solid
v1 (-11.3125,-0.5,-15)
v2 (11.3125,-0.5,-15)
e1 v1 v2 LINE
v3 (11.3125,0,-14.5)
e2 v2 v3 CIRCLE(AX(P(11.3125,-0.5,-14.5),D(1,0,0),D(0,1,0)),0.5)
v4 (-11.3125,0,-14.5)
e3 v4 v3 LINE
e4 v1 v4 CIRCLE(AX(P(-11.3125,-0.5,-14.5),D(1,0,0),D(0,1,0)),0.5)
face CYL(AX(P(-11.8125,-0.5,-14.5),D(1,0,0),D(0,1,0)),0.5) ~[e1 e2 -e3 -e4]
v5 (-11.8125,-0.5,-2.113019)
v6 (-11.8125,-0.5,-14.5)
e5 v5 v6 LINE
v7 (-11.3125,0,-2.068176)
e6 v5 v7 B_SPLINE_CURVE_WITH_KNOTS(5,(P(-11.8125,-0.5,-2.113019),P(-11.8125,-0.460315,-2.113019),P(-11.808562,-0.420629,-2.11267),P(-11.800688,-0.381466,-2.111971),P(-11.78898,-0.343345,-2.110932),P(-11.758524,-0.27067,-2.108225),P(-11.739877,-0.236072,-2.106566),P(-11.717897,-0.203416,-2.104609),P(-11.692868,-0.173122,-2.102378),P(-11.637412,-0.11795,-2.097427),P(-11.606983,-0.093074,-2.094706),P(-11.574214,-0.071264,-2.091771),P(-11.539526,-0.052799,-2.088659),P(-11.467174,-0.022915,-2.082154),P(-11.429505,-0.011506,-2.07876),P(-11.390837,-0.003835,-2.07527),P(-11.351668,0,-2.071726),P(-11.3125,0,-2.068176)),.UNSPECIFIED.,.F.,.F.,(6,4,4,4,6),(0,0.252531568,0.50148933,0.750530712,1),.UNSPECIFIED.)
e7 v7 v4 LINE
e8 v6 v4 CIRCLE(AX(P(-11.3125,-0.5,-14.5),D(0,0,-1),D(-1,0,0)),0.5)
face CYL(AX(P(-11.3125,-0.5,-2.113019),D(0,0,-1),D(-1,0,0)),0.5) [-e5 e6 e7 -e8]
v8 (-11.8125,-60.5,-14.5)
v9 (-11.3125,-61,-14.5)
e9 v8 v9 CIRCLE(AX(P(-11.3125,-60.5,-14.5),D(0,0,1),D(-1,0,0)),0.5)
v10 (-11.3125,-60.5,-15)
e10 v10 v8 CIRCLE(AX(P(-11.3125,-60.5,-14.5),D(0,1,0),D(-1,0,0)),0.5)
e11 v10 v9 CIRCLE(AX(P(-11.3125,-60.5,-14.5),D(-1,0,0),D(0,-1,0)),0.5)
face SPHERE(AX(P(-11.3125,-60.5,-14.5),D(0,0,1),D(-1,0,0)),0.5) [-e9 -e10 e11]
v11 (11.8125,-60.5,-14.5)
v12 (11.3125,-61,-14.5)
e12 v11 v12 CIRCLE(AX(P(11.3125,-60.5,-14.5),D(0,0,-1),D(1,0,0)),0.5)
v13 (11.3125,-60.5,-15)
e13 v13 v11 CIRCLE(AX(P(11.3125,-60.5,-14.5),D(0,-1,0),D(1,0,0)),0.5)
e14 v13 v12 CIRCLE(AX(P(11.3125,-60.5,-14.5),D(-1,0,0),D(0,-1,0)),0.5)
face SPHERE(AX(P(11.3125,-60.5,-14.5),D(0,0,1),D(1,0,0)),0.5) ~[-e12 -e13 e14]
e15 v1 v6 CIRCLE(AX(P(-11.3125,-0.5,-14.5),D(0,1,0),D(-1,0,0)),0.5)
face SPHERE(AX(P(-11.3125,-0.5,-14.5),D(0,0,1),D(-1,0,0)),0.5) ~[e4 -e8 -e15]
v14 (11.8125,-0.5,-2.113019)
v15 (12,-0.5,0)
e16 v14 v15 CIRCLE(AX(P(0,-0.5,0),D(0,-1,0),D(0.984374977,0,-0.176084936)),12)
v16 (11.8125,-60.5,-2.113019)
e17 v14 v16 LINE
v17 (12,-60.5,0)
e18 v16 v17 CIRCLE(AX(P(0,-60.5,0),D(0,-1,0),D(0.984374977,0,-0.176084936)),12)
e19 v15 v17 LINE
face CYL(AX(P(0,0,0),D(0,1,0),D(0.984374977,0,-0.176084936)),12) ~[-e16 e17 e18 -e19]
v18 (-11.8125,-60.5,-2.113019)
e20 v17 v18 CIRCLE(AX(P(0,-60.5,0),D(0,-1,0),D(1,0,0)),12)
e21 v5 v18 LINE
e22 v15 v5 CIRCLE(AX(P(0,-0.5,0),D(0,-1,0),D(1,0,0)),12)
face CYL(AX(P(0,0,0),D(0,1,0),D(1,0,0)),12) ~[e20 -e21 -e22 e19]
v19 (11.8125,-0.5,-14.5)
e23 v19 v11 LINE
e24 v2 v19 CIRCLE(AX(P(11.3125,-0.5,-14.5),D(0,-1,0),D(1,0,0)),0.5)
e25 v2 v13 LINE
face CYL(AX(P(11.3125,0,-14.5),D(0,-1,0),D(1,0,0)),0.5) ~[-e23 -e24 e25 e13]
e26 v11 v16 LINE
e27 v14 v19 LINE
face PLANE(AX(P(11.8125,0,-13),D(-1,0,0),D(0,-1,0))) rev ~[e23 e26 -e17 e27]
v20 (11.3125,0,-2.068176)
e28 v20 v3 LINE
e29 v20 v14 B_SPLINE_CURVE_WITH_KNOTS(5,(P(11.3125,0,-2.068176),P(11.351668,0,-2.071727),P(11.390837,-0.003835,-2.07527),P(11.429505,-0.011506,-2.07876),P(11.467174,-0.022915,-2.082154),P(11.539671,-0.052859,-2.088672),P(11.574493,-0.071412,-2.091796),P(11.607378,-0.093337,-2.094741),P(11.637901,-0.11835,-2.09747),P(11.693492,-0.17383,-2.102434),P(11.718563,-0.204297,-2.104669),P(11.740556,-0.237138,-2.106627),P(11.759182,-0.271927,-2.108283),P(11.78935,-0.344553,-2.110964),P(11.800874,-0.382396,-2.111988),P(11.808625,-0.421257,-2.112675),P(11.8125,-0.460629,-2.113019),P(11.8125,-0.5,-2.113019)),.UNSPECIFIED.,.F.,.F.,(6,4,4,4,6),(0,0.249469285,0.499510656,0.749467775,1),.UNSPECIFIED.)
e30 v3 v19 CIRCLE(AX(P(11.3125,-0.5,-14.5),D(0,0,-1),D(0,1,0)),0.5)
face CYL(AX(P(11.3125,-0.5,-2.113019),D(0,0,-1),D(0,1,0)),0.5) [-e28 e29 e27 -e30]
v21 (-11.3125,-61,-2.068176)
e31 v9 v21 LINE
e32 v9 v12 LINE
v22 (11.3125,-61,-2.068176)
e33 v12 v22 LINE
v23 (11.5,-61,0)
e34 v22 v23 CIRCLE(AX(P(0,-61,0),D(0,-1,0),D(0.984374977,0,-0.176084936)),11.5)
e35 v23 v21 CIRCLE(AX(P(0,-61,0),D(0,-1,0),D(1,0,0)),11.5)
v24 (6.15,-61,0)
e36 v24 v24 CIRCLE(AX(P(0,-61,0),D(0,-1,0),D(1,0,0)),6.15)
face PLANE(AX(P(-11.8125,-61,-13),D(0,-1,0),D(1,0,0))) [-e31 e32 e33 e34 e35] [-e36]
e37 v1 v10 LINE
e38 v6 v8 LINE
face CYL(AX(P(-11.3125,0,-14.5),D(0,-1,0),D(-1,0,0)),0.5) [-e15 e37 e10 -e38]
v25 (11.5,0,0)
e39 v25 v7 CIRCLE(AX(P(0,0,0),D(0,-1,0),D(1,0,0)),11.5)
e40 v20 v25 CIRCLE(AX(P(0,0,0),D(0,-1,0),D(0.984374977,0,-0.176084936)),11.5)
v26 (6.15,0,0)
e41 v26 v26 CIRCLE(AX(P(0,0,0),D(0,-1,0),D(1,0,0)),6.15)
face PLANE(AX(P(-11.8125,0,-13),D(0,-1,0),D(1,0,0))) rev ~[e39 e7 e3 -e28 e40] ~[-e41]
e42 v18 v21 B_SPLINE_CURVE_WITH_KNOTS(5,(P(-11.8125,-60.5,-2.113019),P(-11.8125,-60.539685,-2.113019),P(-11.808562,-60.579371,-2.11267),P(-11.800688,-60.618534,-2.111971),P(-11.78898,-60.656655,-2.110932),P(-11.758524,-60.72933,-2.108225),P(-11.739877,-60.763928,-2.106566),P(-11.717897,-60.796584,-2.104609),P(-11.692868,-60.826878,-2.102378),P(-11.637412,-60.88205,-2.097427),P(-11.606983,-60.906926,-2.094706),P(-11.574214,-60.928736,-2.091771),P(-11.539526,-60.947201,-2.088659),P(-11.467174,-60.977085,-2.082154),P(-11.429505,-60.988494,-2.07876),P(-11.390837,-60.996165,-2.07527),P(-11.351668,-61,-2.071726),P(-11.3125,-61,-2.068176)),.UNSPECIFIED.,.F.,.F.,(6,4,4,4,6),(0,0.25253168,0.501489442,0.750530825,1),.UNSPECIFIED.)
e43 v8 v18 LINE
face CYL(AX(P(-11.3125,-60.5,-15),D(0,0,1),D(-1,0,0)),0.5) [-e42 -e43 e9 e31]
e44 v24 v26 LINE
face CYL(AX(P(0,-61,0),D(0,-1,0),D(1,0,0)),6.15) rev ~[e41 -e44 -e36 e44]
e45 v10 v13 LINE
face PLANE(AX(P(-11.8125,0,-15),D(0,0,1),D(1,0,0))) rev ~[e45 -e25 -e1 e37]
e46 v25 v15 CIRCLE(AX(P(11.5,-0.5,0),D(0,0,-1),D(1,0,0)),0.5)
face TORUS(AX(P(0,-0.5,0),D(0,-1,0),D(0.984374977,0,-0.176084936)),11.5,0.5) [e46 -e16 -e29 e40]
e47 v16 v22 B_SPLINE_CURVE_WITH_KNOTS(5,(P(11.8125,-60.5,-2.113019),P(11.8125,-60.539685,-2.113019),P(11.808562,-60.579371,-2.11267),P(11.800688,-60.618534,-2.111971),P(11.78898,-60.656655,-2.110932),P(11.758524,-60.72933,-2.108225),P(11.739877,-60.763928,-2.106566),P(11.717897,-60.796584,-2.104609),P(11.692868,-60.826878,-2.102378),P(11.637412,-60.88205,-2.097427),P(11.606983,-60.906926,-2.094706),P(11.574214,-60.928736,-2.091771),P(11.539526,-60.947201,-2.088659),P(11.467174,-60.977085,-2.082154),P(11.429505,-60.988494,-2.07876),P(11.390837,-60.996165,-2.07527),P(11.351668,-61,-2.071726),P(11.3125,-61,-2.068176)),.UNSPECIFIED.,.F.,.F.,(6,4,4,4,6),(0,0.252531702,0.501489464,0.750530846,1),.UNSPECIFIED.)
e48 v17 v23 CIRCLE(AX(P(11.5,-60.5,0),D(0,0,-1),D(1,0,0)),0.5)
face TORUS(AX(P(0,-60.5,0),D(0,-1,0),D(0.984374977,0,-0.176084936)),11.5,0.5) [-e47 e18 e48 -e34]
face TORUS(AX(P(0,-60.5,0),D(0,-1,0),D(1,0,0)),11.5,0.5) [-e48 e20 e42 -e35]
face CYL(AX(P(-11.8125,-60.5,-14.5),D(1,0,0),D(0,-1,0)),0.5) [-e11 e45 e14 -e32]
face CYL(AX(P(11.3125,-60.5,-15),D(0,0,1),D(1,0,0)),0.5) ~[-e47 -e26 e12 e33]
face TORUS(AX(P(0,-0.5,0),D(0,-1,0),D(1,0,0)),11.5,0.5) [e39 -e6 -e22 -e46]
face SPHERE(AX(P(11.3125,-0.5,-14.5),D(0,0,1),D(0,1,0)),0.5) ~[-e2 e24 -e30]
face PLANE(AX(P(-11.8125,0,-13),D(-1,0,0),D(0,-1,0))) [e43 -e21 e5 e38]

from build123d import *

# Parameters (mm, degrees)
F1_R     = 6.15
F2_DEPTH = 61
F3_DEPTH = 61.001
F4_DEPTH = 2
F5_R     = 0.5


# Not quite as in the source:
# - two fillets or chamfers of one size are made in one step


with BuildPart() as f2:
    # F1 (on face) → F2 (new body)
    with BuildSketch(Plane.XZ):
        Circle(F1_R)
    extrude(amount=F2_DEPTH)


with BuildPart() as f2b:
    # F0 (on Front) → F2, piece 2 (new body)
    with BuildSketch(Plane.XZ):
        with BuildLine():
            ThreePointArc((11.8124997243, -2.1130192291), (11.9530330187, -1.0606609515), (12, 0))
            ThreePointArc((12, 0), (-1.0606609515, 11.9530330187), (-11.8124997243, -2.1130192291))
            Line((-11.8124997243, -2.1130192291), (-11.8124997243, 1))
            Line((-11.8124997243, 1), (11.8124997243, 1))
            Line((11.8124997243, 1), (11.8124997243, -2.1130192291))
        make_face()
        with BuildLine():
            Line((-11.8124997243, 1), (-11.8124997243, -2.1130192291))
            ThreePointArc((-11.8124997243, -2.1130192291), (0, -12), (11.8124997243, -2.1130192291))
            Line((11.8124997243, -2.1130192291), (11.8124997243, 1))
            Line((11.8124997243, 1), (-11.8124997243, 1))
        make_face()
        with BuildLine():
            ThreePointArc((11.8124997243, -2.1130192291), (0, -12), (-11.8124997243, -2.1130192291))
            Line((-11.8124997243, -2.1130192291), (-11.8124997243, -13))
            Line((-11.8124997243, -13), (11.8124997243, -13))
            Line((11.8124997243, -13), (11.8124997243, -2.1130192291))
        make_face()
    extrude(amount=F2_DEPTH)


with BuildPart() as f3_tool:
    # F3 (cut, through all): a face of the model
    f3_faces = [f2.part.faces().sort_by_distance(p)[0] for p in [
        (0, -61, 0),
    ]]
    extrude(f3_faces, amount=-F3_DEPTH)


with BuildPart() as f2_1:
    add(f2.part)

    # F3: cut by f3_tool
    add(f3_tool.part, mode=Mode.SUBTRACT)


with BuildPart() as f2b_1:
    add(f2b.part)

    # F3: cut by f3_tool
    add(f3_tool.part, mode=Mode.SUBTRACT)

    # F4 (add): a face of the model
    f4_faces = [f2b_1.faces().sort_by_distance(p)[0] for p in [
        (0, -30.5, -13),
    ]]
    extrude(f4_faces, amount=F4_DEPTH)

    # F5
    f5_edges = [f2b_1.edges().sort_by_distance(p)[0] for p in [
        (0, -61, 12),
        (-11.8125, -61, -8.55651),
        (11.8125, -61, -8.55651),
        (11.8125, 0, -8.55651),
        (-11.8125, 0, -8.55651),
        (0, 0, 12),
        (-11.8125, -30.5, -15),
        (0, 0, -15),
        (11.8125, -30.5, -15),
        (0, -61, -15),
    ]]
    fillet(f5_edges, radius=F5_R)


solid = f2b_1.part
